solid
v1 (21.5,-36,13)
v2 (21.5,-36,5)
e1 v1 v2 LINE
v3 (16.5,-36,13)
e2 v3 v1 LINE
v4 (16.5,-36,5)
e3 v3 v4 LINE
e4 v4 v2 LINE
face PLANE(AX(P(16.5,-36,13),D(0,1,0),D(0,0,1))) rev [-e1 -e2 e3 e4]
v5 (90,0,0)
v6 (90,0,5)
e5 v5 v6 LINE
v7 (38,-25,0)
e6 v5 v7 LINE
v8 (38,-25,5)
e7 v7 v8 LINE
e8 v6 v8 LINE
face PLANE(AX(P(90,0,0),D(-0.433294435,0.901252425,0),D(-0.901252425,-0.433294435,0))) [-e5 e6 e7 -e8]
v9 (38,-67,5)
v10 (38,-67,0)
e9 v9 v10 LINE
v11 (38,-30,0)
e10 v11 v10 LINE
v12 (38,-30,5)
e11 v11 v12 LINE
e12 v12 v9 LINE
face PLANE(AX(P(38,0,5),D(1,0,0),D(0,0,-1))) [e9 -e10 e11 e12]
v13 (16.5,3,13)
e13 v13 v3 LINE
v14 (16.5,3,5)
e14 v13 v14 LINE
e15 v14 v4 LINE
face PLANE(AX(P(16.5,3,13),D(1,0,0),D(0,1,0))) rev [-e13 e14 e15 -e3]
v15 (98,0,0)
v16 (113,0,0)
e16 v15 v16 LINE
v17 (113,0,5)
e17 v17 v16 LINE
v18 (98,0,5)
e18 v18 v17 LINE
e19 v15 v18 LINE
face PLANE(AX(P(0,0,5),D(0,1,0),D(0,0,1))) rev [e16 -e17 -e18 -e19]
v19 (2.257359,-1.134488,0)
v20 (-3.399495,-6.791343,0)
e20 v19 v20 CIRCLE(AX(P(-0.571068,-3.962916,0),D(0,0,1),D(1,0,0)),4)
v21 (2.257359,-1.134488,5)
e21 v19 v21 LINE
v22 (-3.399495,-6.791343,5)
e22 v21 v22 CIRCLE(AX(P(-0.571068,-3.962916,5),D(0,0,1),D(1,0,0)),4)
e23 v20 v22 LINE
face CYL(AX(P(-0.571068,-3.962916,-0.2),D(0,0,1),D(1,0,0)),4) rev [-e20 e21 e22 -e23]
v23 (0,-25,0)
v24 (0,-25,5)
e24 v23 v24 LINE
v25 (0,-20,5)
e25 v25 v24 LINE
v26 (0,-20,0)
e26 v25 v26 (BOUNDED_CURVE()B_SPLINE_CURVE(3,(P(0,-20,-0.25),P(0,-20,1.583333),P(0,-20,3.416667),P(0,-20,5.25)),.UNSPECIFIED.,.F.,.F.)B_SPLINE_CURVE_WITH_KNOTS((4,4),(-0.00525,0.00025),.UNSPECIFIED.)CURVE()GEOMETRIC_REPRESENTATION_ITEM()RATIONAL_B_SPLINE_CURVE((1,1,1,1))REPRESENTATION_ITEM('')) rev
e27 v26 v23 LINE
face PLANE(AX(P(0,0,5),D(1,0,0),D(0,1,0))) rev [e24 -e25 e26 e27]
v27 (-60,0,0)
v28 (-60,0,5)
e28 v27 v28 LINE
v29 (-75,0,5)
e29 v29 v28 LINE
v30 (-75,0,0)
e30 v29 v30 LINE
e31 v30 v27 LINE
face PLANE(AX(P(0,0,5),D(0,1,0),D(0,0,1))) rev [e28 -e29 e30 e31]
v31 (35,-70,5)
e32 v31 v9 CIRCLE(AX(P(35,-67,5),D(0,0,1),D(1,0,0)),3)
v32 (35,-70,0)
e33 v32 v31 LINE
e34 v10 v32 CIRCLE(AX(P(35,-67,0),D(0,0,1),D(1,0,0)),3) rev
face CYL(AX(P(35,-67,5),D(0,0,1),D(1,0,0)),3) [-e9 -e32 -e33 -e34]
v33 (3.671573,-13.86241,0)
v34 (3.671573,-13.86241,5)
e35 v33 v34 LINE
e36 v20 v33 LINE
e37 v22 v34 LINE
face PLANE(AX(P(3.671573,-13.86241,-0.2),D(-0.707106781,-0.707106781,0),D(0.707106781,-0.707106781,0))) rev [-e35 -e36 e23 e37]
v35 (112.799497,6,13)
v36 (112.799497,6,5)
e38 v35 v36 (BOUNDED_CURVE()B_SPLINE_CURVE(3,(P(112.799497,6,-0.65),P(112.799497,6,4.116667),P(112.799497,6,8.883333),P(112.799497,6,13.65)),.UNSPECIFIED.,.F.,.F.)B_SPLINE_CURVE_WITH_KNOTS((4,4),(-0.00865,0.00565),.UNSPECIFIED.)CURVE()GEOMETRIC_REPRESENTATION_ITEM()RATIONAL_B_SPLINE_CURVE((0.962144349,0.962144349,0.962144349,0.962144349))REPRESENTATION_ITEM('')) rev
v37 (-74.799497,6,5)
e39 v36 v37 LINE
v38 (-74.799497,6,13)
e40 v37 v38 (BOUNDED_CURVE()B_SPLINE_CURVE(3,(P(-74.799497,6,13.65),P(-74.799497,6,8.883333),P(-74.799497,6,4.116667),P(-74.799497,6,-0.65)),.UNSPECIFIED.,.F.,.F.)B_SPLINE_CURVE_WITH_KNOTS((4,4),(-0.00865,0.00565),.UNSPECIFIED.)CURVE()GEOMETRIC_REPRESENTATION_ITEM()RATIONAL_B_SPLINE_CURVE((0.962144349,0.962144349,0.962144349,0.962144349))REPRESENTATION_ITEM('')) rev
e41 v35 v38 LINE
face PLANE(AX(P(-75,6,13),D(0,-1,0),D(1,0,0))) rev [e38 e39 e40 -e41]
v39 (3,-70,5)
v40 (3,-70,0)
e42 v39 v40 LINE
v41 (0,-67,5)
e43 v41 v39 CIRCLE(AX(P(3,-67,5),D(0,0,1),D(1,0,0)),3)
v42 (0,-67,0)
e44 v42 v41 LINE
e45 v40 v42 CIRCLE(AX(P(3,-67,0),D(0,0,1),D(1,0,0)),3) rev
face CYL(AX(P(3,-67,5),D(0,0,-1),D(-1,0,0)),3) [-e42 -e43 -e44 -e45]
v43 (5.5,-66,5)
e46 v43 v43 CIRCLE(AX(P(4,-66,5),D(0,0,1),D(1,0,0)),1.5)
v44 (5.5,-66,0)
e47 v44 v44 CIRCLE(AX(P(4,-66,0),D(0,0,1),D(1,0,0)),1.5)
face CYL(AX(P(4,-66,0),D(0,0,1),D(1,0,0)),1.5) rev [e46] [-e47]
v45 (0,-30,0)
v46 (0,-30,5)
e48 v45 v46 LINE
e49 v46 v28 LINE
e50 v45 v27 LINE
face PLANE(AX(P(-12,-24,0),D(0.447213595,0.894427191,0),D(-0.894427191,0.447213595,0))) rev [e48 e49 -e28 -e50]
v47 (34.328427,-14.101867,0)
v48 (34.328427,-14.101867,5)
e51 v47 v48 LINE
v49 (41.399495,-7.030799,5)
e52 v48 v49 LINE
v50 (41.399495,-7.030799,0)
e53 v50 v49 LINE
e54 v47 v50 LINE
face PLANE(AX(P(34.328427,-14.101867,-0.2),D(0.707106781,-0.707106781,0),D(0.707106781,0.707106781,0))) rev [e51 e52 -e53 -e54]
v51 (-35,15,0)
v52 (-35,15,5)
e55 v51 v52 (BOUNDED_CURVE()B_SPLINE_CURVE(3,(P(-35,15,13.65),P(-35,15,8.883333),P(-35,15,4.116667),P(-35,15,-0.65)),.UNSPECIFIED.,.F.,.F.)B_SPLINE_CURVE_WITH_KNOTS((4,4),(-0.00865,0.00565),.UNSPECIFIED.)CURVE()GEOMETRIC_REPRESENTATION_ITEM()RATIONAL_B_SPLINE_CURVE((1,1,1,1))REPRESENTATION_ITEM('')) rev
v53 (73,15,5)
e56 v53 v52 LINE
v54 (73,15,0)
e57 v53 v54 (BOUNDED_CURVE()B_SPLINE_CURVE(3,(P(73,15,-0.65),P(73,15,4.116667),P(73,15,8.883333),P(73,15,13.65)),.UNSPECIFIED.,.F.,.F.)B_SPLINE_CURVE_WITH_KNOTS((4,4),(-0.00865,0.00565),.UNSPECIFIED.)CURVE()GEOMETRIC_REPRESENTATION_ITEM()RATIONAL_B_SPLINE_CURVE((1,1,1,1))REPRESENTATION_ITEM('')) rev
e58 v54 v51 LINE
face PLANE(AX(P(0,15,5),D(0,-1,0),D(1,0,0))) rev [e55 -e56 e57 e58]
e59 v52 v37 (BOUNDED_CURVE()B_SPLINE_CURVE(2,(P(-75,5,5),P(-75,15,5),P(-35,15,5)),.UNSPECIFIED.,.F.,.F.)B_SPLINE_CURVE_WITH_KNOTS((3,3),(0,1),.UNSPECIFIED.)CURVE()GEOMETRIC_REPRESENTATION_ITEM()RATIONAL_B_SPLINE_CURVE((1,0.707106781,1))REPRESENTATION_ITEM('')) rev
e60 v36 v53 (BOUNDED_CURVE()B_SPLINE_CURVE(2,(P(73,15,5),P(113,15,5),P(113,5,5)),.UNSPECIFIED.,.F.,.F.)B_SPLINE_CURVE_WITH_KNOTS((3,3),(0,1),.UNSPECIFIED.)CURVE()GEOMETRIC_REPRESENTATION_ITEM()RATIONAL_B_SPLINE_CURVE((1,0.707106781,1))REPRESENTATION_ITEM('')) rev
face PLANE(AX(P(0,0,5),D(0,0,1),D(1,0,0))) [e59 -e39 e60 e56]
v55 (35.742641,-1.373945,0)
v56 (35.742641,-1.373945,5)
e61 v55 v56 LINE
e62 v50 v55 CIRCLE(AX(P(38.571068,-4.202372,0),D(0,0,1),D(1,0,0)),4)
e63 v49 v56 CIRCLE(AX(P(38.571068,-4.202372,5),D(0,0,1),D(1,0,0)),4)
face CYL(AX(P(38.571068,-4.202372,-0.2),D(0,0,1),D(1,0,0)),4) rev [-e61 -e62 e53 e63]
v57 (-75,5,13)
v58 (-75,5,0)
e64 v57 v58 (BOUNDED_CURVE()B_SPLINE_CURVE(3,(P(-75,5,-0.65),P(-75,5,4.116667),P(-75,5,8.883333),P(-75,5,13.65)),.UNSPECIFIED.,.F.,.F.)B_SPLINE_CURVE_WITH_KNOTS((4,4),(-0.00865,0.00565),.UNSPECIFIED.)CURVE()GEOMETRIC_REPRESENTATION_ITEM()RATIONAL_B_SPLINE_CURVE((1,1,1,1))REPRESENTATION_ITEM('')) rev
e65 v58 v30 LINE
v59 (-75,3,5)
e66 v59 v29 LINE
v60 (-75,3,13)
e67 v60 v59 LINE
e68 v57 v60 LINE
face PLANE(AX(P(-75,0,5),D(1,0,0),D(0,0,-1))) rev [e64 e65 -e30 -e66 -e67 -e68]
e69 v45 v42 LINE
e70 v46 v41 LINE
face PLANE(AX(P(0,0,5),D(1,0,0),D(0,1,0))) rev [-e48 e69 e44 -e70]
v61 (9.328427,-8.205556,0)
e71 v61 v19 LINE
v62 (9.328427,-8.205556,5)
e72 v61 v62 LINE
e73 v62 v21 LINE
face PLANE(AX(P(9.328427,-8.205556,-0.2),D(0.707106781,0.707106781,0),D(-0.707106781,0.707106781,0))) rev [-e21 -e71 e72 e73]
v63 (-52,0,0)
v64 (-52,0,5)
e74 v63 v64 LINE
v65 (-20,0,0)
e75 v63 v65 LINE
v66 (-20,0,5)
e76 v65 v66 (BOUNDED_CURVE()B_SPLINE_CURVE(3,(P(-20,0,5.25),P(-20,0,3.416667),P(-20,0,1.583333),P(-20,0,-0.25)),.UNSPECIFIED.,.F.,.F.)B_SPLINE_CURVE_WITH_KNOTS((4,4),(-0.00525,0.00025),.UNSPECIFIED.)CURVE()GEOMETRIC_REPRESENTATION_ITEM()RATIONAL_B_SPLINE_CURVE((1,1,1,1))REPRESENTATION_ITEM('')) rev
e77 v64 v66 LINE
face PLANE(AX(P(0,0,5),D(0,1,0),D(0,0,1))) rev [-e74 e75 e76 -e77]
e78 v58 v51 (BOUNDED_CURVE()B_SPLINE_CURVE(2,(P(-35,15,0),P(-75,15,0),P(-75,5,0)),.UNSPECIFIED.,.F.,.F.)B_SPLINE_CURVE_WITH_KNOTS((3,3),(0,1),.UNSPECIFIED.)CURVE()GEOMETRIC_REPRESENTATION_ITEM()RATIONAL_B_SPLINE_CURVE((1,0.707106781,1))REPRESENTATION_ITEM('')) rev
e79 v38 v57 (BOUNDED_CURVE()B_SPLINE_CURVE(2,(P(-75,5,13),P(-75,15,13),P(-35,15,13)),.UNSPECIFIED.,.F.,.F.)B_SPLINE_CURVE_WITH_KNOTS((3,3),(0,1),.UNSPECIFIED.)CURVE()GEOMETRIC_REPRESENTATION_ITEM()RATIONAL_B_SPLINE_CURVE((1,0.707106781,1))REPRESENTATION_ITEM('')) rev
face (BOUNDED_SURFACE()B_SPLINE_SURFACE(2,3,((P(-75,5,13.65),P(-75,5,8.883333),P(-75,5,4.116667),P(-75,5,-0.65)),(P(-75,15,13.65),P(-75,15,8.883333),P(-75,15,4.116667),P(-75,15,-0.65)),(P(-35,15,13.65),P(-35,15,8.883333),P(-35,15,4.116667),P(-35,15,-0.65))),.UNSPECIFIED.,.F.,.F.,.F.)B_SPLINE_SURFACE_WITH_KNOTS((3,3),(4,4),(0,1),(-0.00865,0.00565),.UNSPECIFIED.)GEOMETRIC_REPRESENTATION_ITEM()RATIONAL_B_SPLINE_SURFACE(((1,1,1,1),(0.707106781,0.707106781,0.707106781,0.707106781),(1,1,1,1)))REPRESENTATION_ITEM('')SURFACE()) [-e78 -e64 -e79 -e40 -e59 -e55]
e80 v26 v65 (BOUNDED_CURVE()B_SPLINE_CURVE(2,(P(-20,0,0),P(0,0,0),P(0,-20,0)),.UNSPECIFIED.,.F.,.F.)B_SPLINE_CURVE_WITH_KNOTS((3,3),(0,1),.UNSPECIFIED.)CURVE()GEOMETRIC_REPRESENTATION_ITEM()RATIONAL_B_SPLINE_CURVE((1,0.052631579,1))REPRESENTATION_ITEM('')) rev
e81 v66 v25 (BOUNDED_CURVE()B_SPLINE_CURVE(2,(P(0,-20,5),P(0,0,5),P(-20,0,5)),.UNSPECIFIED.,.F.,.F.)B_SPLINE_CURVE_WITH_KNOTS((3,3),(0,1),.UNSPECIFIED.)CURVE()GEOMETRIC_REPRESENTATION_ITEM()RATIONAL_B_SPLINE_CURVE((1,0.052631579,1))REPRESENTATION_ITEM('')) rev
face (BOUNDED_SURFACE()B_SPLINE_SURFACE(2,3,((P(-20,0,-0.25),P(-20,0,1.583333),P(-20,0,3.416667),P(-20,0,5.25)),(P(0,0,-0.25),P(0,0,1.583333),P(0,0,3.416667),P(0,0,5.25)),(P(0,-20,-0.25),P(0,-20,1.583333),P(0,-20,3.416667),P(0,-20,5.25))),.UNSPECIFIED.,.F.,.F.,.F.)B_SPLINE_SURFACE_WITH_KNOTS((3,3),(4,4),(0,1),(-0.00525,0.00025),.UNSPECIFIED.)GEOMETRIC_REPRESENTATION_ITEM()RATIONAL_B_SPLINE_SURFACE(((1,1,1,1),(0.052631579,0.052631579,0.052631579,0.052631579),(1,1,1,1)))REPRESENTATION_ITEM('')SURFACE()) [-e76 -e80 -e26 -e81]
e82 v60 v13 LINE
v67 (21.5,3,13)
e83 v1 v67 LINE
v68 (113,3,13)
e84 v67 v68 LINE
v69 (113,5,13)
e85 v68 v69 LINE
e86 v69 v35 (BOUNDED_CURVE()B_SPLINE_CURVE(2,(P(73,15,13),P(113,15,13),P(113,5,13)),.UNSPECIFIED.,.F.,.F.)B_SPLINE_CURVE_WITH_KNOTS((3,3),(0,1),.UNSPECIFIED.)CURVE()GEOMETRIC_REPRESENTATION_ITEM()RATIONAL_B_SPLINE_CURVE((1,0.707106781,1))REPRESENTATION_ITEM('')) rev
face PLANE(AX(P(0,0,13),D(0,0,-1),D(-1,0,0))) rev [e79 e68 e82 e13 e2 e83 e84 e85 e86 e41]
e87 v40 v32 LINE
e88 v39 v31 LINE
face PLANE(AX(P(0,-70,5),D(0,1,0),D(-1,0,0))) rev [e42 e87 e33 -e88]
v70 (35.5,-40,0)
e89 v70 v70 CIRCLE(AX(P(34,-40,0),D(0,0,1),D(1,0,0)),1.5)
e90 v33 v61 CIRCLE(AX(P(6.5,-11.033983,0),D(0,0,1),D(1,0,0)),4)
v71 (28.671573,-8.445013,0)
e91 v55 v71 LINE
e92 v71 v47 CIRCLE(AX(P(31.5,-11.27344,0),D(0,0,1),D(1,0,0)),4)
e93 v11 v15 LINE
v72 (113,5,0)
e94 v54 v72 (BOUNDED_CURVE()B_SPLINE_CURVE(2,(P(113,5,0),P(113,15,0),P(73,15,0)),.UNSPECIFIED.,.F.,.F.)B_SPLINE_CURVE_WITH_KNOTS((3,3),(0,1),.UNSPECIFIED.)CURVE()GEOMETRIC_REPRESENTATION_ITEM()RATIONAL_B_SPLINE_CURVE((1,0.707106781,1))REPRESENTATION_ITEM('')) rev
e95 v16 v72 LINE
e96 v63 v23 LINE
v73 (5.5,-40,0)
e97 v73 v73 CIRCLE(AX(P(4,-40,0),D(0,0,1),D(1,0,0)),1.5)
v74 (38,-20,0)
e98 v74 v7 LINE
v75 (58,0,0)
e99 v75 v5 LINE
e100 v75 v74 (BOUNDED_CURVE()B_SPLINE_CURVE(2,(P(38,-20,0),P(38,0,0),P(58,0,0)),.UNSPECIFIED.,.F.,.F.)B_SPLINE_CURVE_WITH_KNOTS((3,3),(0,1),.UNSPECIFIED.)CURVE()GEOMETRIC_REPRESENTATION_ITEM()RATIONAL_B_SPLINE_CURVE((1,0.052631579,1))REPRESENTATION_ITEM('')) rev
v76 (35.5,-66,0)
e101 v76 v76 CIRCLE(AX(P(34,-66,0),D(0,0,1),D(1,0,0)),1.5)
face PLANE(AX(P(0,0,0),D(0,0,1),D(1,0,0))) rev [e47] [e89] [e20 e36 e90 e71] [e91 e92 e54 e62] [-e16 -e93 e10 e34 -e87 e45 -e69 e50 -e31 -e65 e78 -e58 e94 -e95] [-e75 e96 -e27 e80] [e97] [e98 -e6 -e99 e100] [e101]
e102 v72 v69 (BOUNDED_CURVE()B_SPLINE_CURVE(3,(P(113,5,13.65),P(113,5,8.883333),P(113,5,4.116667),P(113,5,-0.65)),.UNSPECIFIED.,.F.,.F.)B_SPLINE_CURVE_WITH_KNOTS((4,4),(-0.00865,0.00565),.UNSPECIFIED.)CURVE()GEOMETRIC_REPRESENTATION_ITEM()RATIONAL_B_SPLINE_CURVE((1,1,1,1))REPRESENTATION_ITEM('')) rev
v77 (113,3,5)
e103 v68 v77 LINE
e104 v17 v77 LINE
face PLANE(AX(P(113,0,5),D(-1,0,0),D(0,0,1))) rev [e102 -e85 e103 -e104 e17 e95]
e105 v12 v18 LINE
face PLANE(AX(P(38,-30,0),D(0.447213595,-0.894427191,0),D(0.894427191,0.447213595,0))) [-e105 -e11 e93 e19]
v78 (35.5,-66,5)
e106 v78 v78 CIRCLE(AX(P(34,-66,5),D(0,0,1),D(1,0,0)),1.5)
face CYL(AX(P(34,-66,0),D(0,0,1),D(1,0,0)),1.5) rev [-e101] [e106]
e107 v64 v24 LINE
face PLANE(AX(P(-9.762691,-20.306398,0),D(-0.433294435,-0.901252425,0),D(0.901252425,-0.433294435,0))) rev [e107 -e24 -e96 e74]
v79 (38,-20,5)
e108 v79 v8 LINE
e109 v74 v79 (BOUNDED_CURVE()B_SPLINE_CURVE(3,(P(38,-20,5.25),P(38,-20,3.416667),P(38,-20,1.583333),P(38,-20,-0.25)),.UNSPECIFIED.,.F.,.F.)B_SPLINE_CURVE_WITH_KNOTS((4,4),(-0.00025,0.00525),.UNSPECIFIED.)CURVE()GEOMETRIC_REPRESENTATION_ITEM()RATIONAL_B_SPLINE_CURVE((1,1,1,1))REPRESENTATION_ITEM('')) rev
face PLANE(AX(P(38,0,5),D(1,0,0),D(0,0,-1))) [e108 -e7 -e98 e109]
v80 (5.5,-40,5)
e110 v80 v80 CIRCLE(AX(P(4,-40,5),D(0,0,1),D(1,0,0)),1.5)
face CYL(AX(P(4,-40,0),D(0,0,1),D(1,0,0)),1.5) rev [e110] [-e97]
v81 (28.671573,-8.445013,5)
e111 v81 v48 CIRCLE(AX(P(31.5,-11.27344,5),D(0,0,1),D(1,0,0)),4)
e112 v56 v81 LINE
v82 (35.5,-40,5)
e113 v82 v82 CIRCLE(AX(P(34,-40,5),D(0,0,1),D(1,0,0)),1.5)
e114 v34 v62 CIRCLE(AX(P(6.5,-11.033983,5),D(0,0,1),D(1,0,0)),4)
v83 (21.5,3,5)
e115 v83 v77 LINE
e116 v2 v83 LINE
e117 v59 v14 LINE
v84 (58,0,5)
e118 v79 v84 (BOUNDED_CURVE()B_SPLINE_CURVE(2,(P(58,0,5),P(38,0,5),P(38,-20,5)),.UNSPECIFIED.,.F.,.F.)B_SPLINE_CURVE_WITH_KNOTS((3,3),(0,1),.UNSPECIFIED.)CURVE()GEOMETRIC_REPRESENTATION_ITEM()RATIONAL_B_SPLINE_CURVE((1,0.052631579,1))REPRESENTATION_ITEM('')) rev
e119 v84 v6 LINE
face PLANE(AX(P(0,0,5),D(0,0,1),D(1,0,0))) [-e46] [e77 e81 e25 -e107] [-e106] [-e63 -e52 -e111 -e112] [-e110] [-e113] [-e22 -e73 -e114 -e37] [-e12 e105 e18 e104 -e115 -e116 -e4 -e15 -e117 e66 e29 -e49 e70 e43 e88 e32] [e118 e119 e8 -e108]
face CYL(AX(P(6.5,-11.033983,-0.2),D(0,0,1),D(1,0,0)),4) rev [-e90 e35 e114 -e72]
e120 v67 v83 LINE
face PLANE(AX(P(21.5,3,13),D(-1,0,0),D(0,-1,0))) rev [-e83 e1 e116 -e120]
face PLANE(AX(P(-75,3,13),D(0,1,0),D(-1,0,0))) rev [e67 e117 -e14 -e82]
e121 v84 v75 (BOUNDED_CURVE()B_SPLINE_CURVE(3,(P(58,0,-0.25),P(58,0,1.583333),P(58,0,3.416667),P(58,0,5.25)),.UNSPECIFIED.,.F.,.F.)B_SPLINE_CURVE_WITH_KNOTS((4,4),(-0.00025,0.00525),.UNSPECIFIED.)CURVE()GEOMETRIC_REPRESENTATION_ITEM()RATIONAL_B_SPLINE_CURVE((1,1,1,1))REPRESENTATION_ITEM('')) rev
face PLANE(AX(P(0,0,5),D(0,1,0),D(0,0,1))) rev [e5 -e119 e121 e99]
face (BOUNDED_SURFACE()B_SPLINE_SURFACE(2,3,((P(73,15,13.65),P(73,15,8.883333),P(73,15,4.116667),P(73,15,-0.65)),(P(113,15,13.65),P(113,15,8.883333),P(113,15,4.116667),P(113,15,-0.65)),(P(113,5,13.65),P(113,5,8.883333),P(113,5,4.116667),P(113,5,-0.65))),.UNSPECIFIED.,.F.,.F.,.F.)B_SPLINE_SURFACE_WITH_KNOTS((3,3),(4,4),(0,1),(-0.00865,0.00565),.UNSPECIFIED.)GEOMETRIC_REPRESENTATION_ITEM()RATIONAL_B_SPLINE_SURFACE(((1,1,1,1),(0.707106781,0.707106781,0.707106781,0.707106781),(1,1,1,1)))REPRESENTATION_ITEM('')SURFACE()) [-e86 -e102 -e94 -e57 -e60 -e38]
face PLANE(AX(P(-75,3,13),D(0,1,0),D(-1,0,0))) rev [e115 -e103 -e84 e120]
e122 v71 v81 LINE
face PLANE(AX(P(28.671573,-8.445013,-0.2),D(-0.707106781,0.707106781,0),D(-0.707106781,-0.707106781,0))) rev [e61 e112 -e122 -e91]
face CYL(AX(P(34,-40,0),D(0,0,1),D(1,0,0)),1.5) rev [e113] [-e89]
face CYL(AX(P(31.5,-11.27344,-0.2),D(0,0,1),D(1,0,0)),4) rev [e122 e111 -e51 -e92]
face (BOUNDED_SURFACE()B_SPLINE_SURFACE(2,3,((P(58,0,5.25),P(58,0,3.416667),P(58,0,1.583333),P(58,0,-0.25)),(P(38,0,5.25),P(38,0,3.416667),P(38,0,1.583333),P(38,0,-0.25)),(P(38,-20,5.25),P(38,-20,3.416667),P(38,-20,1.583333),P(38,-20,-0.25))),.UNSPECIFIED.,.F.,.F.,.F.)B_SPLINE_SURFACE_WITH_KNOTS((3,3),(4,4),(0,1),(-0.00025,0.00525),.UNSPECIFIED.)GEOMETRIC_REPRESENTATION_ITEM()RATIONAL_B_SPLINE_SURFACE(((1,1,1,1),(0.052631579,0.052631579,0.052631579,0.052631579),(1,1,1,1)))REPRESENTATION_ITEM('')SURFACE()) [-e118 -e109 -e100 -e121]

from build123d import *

# Parameters (mm, degrees)
SKETCH1_W           = 38
SKETCH1_H           = 70
BOSS_EXTRUDE1_DEPTH = 5
SKETCH2_R           = 1.5
CUT_EXTRUDE1_DEPTH  = 134.018795664
FILLET1_R           = 3
FILLET2_DEPTH       = 5
SKETCH3_W           = 188
SKETCH3_H           = 3
BOSS_EXTRUDE2_DEPTH = 8
SKETCH4_W           = 5
SKETCH4_H           = 39
BOSS_EXTRUDE3_DEPTH = 8
BOSS_EXTRUDE4_DEPTH = 5
FILLET3_SIZE        = 40
FILLET3_SIZE_2      = 10
FILLET4_SIZE        = 40
FILLET4_SIZE_2      = 10
CUT_EXTRUDE2_DEPTH  = 134.165310942


with BuildPart() as part:
    # Sketch1 → Boss-Extrude1 (new body)
    with BuildSketch(Plane.XY):
        with Locations((19, -35)):
            Rectangle(SKETCH1_W, SKETCH1_H)
        Polygon((-75, 15), (-75, 0), (0, 0), (38, 0), (113, 0), (113, 15), align=None)
    extrude(amount=BOSS_EXTRUDE1_DEPTH)

    # Sketch2 → Cut-Extrude1 (cut, through all)
    with BuildSketch(Plane.XY.offset(5)):
        with Locations((34, -66)):
            Circle(SKETCH2_R)
        with Locations((4, -66)):
            Circle(SKETCH2_R)
        with Locations((4, -40)):
            Circle(SKETCH2_R)
        with Locations((34, -40)):
            Circle(SKETCH2_R)
    extrude(amount=-CUT_EXTRUDE1_DEPTH, mode=Mode.SUBTRACT)

    # Fillet1
    fillet1_edges = [part.edges().sort_by_distance(p)[0] for p in [
        (38, -70, 2.5),
        (0, -70, 2.5),
    ]]
    fillet(fillet1_edges, radius=FILLET1_R)

    # Fillet2: read off the stored shape, not the designer's step
    # Fillet2 outline → Fillet2 (add)
    with BuildSketch(Plane.XY):
        with BuildLine():
            add(Edge.make_bspline(
                [(58, 0), (38, 0), (38, -20)],
                knots=[0, 0, 0, 1, 1, 1], degree=2, weights=[1, 0.052631579, 1]))
            Line((58, 0), (38, 0))
            Line((38, 0), (38, -20))
        make_face()
        with BuildLine():
            Line((0, 0), (-20, 0))
            add(Edge.make_bspline(
                [(-20, 0), (0, 0), (0, -20)],
                knots=[0, 0, 0, 1, 1, 1], degree=2, weights=[1, 0.052631579, 1]))
            Line((0, -20), (0, 0))
        make_face()
    extrude(amount=FILLET2_DEPTH)

    # Sketch3 → Boss-Extrude2 (add)
    with BuildSketch(Plane.XY.offset(5)):
        with Locations((19, 4.5)):
            Rectangle(SKETCH3_W, SKETCH3_H)
    extrude(amount=BOSS_EXTRUDE2_DEPTH)

    # Sketch4 → Boss-Extrude3 (add)
    with BuildSketch(Plane.XY.offset(5)):
        with Locations((19, -16.5)):
            Rectangle(SKETCH4_W, SKETCH4_H)
    extrude(amount=BOSS_EXTRUDE3_DEPTH)

    # Sketch5 → Boss-Extrude4 (add)
    with BuildSketch(Plane.XY.offset(5)):
        Polygon((-52, 0), (-57.902965871, 0), (-60, 0), (0, -30), (0, -25), align=None)
        Polygon((38, -30), (98, 0), (90, 0), (38, -25), align=None)
    extrude(amount=-BOSS_EXTRUDE4_DEPTH)

    # Fillet3
    # a fillet whose section is not a circle: 40, 10 mm, written as the material it takes off along each edge
    with BuildSketch(Plane(origin=(-75, 15, -100), x_dir=(1, 0, 0), z_dir=(0, 0, 1))) as fillet3_piece_1:
        with BuildLine():
            Bezier((FILLET3_SIZE, 0), (0, 0), (0, -FILLET3_SIZE_2), weights=[1, 0.707106781, 1])
            Line((0, -FILLET3_SIZE_2), (0, 0))
            Line((0, 0), (FILLET3_SIZE, 0))
        make_face()
    extrude(amount=205, mode=Mode.SUBTRACT)

    # Fillet4
    # a fillet whose section is not a circle: 40, 10 mm, written as the material it takes off along each edge
    with BuildSketch(Plane(origin=(113, 15, -100), x_dir=(-1, 0, 0), z_dir=(0, 0, 1))) as fillet4_piece_1:
        with BuildLine():
            Bezier((FILLET4_SIZE, 0), (0, 0), (0, FILLET4_SIZE_2), weights=[1, 0.707106781, 1])
            Line((0, FILLET4_SIZE_2), (0, 0))
            Line((0, 0), (FILLET4_SIZE, 0))
        make_face()
    extrude(amount=205, mode=Mode.SUBTRACT)

    # Sketch6 → Cut-Extrude2 (cut, through all)
    with BuildSketch(Plane.XY.offset(5)):
        with BuildLine():
            Line((3.671572875, -13.862410437), (-3.399494937, -6.791342626))
            ThreePointArc((-3.399494937, -6.791342626), (-3.399494937, -1.134488376), (2.257359313, -1.134488376))
            Line((2.257359313, -1.134488376), (9.328427125, -8.205556188))
            ThreePointArc((9.328427125, -8.205556188), (9.328427125, -13.862410437), (3.671572875, -13.862410437))
        make_face()
        with BuildLine():
            Line((28.671572875, -8.445013015), (35.742640687, -1.373945203))
            ThreePointArc((35.742640687, -1.373945203), (41.399494937, -1.373945203), (41.399494937, -7.030799453))
            Line((41.399494937, -7.030799453), (34.328427125, -14.101867265))
            ThreePointArc((34.328427125, -14.101867265), (28.671572875, -14.101867265), (28.671572875, -8.445013015))
        make_face()
    extrude(amount=-CUT_EXTRUDE2_DEPTH, mode=Mode.SUBTRACT)


solid = part.part
